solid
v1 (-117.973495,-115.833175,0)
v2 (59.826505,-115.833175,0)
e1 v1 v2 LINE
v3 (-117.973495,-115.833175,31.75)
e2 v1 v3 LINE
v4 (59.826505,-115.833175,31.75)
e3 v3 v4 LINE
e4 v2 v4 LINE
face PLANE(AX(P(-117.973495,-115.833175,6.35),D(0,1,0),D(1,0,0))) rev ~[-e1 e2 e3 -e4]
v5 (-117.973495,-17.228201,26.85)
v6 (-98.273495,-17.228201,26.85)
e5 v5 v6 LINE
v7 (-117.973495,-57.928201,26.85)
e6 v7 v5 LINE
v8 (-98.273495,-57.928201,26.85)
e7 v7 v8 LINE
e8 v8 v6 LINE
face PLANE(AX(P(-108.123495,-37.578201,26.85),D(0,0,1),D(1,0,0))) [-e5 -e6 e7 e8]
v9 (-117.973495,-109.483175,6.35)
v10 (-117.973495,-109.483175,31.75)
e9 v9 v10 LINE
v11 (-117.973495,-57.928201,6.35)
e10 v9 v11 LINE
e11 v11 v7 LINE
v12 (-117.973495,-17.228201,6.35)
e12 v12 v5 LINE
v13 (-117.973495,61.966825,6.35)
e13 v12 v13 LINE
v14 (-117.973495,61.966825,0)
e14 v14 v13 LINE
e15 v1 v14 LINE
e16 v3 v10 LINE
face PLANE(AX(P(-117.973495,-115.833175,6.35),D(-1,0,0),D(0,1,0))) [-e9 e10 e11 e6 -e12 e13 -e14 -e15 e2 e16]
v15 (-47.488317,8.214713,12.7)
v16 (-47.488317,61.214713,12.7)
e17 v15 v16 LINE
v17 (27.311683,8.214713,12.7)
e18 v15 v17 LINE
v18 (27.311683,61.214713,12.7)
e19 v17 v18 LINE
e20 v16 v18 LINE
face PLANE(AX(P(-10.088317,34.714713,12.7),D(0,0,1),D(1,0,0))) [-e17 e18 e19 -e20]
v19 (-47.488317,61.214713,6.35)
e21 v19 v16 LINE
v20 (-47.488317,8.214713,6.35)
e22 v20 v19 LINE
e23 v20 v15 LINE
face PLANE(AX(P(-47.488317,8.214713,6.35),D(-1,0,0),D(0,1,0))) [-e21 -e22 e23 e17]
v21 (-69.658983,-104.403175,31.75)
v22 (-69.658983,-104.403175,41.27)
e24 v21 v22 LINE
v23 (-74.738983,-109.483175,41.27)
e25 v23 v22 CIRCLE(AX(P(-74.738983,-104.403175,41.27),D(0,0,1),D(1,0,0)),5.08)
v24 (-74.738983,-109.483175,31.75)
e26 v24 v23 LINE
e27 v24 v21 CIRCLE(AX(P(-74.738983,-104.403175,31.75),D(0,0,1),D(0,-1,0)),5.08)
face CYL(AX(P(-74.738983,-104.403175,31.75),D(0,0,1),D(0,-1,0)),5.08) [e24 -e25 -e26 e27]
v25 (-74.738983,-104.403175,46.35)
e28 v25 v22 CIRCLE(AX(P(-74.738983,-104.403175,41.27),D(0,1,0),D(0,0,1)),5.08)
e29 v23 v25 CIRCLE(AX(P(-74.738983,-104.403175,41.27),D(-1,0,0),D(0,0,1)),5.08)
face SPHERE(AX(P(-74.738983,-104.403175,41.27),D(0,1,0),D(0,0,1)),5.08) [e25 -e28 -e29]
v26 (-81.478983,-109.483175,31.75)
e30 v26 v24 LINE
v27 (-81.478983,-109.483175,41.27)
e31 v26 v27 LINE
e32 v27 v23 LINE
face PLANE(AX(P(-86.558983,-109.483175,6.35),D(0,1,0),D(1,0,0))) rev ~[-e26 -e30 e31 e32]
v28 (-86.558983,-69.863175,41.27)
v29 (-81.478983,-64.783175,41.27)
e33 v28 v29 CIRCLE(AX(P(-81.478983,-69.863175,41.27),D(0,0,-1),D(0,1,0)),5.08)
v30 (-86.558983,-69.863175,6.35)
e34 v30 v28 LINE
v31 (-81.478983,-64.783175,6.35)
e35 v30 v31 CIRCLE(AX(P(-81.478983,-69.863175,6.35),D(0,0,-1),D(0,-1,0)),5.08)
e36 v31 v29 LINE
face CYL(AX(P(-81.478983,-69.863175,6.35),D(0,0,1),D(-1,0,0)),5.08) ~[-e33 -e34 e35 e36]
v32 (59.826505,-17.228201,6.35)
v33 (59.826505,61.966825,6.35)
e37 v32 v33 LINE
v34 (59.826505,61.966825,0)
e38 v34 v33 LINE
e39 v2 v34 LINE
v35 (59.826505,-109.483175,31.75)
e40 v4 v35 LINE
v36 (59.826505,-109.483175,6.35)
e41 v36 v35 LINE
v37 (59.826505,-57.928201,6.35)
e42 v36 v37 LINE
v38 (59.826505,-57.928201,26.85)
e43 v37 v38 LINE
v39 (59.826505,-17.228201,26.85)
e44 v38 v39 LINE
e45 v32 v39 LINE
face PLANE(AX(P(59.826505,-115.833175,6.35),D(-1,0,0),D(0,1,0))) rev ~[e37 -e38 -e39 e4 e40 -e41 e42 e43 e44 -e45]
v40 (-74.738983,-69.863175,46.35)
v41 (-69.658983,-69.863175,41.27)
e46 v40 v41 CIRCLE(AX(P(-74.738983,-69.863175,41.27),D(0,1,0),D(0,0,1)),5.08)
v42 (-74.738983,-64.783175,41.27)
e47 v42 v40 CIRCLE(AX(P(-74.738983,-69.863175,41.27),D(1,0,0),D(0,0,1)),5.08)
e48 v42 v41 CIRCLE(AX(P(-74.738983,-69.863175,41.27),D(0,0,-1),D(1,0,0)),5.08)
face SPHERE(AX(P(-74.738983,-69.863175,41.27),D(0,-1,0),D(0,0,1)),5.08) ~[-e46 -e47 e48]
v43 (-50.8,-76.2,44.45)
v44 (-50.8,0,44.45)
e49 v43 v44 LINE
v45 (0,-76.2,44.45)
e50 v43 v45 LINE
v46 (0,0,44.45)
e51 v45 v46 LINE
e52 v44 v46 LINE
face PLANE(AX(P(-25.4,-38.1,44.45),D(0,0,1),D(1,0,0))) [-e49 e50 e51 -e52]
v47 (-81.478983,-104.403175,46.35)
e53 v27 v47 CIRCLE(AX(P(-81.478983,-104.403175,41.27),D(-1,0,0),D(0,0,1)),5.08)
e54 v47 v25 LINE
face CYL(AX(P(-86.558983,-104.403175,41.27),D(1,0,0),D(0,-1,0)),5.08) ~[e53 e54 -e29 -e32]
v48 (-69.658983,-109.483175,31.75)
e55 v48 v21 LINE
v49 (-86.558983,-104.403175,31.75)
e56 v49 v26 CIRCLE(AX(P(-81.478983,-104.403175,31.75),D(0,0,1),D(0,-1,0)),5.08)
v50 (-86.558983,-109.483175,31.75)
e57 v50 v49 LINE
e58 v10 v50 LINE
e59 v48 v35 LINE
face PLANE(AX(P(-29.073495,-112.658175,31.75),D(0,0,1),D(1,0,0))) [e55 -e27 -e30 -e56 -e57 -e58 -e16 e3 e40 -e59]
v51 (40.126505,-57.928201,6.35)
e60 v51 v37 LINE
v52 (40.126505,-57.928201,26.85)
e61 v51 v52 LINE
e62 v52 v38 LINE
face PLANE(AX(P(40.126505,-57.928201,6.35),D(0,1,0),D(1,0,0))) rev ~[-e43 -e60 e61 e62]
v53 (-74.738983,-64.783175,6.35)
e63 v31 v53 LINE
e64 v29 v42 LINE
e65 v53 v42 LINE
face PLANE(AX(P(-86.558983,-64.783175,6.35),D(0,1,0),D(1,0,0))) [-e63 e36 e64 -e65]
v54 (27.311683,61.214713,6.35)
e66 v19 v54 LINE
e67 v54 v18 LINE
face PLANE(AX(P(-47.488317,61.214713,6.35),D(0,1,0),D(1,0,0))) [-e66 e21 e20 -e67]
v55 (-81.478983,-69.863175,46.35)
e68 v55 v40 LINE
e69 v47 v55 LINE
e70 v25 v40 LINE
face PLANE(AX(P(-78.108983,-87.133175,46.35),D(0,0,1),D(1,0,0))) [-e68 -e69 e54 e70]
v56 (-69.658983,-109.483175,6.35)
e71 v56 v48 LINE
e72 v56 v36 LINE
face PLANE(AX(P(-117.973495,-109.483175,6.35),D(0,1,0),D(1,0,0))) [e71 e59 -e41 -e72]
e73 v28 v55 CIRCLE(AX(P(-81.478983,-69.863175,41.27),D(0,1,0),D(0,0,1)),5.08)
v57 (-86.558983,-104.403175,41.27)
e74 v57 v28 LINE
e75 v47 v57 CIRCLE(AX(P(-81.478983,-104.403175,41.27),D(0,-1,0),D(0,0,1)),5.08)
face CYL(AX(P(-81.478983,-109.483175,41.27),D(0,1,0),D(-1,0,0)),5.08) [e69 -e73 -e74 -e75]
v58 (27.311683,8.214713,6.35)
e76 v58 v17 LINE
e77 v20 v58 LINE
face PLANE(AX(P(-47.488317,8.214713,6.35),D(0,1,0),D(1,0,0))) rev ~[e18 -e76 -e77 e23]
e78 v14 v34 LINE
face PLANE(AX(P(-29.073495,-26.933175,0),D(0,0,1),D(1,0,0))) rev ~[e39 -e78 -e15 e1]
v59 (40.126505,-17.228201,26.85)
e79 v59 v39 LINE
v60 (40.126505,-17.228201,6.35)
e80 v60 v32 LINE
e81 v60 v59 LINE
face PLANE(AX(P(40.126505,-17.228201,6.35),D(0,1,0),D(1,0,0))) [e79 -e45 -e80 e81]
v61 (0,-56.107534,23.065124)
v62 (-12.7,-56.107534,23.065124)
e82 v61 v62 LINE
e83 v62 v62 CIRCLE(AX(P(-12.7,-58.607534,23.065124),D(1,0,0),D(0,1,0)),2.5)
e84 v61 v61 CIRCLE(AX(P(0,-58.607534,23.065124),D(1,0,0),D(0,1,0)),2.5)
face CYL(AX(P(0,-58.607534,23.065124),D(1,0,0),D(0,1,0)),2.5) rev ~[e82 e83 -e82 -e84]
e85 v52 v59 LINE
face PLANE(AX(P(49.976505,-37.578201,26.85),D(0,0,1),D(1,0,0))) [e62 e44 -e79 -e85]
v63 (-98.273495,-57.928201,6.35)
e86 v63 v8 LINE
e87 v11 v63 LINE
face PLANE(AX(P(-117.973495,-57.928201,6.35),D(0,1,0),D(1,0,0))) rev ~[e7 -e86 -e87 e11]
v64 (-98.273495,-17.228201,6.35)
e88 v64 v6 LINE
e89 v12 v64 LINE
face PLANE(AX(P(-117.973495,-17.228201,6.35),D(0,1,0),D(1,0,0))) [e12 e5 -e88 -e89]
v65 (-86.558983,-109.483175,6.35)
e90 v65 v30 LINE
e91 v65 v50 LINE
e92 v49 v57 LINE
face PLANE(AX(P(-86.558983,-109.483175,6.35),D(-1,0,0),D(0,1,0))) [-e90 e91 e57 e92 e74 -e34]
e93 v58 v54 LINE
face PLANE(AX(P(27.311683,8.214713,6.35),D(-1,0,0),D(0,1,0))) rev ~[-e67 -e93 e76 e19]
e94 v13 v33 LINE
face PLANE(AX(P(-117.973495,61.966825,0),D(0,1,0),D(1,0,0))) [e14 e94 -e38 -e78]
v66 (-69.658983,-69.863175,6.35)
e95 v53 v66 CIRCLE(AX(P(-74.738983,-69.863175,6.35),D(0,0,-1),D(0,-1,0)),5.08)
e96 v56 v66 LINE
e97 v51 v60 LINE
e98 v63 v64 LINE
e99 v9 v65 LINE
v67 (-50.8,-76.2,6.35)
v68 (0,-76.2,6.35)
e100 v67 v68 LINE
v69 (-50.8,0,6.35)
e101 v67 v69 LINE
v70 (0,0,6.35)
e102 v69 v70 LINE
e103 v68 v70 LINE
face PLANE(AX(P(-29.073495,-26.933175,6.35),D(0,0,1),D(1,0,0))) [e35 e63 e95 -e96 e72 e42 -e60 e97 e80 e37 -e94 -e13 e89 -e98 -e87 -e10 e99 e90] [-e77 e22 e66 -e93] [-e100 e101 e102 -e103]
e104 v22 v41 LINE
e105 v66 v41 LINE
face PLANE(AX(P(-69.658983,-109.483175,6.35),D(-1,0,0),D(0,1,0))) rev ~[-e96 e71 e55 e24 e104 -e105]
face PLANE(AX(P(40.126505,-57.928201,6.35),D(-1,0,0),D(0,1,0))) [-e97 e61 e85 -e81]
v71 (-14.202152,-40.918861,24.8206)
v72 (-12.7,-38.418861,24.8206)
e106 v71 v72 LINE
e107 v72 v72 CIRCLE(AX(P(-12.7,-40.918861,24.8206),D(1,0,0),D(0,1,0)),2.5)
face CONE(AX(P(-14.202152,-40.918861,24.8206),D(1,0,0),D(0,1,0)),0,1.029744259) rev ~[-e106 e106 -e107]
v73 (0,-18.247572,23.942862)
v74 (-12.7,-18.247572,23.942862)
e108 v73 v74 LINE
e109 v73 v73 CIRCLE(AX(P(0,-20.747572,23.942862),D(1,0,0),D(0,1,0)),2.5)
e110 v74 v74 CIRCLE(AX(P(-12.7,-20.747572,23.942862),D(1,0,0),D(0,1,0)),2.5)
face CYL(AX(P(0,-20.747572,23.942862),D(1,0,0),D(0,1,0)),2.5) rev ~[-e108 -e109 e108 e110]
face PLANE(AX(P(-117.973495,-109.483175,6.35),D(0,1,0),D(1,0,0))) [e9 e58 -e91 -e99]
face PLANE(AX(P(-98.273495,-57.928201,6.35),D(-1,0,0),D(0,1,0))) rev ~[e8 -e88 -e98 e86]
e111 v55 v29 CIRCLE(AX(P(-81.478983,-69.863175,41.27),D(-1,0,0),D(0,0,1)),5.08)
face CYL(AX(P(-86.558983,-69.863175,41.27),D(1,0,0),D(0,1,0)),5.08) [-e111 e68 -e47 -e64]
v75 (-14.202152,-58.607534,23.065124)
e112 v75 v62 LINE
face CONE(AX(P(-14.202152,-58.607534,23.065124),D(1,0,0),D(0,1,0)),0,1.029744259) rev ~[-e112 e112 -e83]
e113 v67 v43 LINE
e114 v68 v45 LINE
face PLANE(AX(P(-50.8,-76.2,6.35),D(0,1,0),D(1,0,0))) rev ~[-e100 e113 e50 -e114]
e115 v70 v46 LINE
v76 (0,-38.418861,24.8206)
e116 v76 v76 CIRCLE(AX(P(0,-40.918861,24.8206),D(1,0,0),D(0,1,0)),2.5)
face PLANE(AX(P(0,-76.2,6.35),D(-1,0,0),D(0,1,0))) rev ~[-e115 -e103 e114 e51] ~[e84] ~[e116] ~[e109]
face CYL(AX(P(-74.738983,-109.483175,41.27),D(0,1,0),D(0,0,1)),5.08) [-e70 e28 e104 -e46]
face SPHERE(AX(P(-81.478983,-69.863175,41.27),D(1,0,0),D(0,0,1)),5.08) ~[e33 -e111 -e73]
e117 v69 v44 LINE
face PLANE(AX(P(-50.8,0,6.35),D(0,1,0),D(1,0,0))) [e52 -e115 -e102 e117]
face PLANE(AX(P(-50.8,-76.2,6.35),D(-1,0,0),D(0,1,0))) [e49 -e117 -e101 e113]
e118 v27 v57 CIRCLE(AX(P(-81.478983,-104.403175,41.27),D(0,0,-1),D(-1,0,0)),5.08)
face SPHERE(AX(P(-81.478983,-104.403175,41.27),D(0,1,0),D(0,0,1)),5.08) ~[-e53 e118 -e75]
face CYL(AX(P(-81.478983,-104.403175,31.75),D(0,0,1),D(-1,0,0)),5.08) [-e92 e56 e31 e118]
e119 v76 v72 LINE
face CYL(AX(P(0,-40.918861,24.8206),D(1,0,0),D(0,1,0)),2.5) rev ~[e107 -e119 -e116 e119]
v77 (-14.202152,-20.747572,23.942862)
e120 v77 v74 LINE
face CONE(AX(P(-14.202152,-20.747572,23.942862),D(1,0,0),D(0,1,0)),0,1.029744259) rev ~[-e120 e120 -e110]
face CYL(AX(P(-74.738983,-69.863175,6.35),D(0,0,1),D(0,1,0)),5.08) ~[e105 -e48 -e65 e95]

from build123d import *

# Parameters (mm, degrees)
F0_W      = 177.8
F0_H      = 177.8
F1_DEPTH  = 6.35
F2_W      = 19.7
F2_H      = 40.7
F3_DEPTH  = 20.5
F4_W      = 50.8
F4_H      = 76.2
F5_DEPTH  = 38.1
F6_W      = 74.8
F6_H      = 53
F7_DEPTH  = 6.35
F8_W      = 177.8
F8_H      = 6.35
F9_DEPTH  = 25.4
F10_W     = 16.9
F10_H     = 44.7
F11_DEPTH = 40
F13_D     = 5
F13_DEPTH = 12.7
F13_TIP   = 1.5021515476
F14_R     = 5.08


# Not quite as in the source:
# - a feature of the source that left no trace in its solid (it failed there, or was rolled back) is left out


with BuildPart() as f1:
    # F0 (on Top) → F1 (new body)
    with BuildSketch(Plane.XY):
        with Locations((-29.0734948754, -26.9331749929)):
            Rectangle(F0_W, F0_H)
    extrude(amount=F1_DEPTH)

    # F2 (on face) → F3 (join)
    with BuildSketch(Plane.XY.offset(6.35)):
        with Locations((49.9765051246, -37.5782008111)):
            Rectangle(F2_W, F2_H)
        with Locations((-108.1234948754, -37.5782008111)):
            Rectangle(F2_W, F2_H)
    extrude(amount=F3_DEPTH)

    # F4 (on face) → F5 (join)
    with BuildSketch(Plane.XY.offset(6.35)):
        with Locations((-25.4, -38.1)):
            Rectangle(F4_W, F4_H)
    extrude(amount=F5_DEPTH)

    # F6 (on face) → F7 (join)
    with BuildSketch(Plane.XY.offset(6.35)):
        with Locations((-10.0883172065, 34.7147134863)):
            Rectangle(F6_W, F6_H)
    extrude(amount=F7_DEPTH)

    # F8 (on face) → F9 (join)
    with BuildSketch(Plane.XY.offset(6.35)):
        with Locations((-29.0734948754, -112.6581749929)):
            Rectangle(F8_W, F8_H)
    extrude(amount=F9_DEPTH)

    # F10 (on face) → F11 (join)
    with BuildSketch(Plane.XY.offset(6.35)):
        with Locations((-78.1089827299, -87.1331749929)):
            Rectangle(F10_W, F10_H)
    extrude(amount=F11_DEPTH)

    # F13 (one way)
    with BuildSketch(Plane.YZ):
        with Locations((-58.6075335741, 23.0651237071), (-40.9188605845, 24.820599705), (-20.7475721836, 23.942861706)):
            Circle(F13_D / 2)
    extrude(amount=-F13_DEPTH, mode=Mode.SUBTRACT)
    with Locations(Plane.YZ):
        with Locations((-58.6075335741, 23.0651237071), (-40.9188605845, 24.820599705), (-20.7475721836, 23.942861706)):
            with Locations((0, 0, -(F13_DEPTH + F13_TIP / 2))):  # 118° drill point
                Cone(0, F13_D / 2, F13_TIP, mode=Mode.SUBTRACT)

    # F14
    f14_edges = [f1.edges().sort_by_distance(p)[0] for p in [
        (-69.658983, -87.133175, 46.35),
        (-78.108983, -64.783175, 46.35),
        (-86.558983, -87.133175, 46.35),
        (-78.108983, -109.483175, 46.35),
        (-86.558983, -64.783175, 26.35),
        (-69.658983, -64.783175, 26.35),
        (-69.658983, -109.483175, 39.05),
        (-86.558983, -109.483175, 39.05),
    ]]
    fillet(f14_edges, radius=F14_R)


solid = f1.part
